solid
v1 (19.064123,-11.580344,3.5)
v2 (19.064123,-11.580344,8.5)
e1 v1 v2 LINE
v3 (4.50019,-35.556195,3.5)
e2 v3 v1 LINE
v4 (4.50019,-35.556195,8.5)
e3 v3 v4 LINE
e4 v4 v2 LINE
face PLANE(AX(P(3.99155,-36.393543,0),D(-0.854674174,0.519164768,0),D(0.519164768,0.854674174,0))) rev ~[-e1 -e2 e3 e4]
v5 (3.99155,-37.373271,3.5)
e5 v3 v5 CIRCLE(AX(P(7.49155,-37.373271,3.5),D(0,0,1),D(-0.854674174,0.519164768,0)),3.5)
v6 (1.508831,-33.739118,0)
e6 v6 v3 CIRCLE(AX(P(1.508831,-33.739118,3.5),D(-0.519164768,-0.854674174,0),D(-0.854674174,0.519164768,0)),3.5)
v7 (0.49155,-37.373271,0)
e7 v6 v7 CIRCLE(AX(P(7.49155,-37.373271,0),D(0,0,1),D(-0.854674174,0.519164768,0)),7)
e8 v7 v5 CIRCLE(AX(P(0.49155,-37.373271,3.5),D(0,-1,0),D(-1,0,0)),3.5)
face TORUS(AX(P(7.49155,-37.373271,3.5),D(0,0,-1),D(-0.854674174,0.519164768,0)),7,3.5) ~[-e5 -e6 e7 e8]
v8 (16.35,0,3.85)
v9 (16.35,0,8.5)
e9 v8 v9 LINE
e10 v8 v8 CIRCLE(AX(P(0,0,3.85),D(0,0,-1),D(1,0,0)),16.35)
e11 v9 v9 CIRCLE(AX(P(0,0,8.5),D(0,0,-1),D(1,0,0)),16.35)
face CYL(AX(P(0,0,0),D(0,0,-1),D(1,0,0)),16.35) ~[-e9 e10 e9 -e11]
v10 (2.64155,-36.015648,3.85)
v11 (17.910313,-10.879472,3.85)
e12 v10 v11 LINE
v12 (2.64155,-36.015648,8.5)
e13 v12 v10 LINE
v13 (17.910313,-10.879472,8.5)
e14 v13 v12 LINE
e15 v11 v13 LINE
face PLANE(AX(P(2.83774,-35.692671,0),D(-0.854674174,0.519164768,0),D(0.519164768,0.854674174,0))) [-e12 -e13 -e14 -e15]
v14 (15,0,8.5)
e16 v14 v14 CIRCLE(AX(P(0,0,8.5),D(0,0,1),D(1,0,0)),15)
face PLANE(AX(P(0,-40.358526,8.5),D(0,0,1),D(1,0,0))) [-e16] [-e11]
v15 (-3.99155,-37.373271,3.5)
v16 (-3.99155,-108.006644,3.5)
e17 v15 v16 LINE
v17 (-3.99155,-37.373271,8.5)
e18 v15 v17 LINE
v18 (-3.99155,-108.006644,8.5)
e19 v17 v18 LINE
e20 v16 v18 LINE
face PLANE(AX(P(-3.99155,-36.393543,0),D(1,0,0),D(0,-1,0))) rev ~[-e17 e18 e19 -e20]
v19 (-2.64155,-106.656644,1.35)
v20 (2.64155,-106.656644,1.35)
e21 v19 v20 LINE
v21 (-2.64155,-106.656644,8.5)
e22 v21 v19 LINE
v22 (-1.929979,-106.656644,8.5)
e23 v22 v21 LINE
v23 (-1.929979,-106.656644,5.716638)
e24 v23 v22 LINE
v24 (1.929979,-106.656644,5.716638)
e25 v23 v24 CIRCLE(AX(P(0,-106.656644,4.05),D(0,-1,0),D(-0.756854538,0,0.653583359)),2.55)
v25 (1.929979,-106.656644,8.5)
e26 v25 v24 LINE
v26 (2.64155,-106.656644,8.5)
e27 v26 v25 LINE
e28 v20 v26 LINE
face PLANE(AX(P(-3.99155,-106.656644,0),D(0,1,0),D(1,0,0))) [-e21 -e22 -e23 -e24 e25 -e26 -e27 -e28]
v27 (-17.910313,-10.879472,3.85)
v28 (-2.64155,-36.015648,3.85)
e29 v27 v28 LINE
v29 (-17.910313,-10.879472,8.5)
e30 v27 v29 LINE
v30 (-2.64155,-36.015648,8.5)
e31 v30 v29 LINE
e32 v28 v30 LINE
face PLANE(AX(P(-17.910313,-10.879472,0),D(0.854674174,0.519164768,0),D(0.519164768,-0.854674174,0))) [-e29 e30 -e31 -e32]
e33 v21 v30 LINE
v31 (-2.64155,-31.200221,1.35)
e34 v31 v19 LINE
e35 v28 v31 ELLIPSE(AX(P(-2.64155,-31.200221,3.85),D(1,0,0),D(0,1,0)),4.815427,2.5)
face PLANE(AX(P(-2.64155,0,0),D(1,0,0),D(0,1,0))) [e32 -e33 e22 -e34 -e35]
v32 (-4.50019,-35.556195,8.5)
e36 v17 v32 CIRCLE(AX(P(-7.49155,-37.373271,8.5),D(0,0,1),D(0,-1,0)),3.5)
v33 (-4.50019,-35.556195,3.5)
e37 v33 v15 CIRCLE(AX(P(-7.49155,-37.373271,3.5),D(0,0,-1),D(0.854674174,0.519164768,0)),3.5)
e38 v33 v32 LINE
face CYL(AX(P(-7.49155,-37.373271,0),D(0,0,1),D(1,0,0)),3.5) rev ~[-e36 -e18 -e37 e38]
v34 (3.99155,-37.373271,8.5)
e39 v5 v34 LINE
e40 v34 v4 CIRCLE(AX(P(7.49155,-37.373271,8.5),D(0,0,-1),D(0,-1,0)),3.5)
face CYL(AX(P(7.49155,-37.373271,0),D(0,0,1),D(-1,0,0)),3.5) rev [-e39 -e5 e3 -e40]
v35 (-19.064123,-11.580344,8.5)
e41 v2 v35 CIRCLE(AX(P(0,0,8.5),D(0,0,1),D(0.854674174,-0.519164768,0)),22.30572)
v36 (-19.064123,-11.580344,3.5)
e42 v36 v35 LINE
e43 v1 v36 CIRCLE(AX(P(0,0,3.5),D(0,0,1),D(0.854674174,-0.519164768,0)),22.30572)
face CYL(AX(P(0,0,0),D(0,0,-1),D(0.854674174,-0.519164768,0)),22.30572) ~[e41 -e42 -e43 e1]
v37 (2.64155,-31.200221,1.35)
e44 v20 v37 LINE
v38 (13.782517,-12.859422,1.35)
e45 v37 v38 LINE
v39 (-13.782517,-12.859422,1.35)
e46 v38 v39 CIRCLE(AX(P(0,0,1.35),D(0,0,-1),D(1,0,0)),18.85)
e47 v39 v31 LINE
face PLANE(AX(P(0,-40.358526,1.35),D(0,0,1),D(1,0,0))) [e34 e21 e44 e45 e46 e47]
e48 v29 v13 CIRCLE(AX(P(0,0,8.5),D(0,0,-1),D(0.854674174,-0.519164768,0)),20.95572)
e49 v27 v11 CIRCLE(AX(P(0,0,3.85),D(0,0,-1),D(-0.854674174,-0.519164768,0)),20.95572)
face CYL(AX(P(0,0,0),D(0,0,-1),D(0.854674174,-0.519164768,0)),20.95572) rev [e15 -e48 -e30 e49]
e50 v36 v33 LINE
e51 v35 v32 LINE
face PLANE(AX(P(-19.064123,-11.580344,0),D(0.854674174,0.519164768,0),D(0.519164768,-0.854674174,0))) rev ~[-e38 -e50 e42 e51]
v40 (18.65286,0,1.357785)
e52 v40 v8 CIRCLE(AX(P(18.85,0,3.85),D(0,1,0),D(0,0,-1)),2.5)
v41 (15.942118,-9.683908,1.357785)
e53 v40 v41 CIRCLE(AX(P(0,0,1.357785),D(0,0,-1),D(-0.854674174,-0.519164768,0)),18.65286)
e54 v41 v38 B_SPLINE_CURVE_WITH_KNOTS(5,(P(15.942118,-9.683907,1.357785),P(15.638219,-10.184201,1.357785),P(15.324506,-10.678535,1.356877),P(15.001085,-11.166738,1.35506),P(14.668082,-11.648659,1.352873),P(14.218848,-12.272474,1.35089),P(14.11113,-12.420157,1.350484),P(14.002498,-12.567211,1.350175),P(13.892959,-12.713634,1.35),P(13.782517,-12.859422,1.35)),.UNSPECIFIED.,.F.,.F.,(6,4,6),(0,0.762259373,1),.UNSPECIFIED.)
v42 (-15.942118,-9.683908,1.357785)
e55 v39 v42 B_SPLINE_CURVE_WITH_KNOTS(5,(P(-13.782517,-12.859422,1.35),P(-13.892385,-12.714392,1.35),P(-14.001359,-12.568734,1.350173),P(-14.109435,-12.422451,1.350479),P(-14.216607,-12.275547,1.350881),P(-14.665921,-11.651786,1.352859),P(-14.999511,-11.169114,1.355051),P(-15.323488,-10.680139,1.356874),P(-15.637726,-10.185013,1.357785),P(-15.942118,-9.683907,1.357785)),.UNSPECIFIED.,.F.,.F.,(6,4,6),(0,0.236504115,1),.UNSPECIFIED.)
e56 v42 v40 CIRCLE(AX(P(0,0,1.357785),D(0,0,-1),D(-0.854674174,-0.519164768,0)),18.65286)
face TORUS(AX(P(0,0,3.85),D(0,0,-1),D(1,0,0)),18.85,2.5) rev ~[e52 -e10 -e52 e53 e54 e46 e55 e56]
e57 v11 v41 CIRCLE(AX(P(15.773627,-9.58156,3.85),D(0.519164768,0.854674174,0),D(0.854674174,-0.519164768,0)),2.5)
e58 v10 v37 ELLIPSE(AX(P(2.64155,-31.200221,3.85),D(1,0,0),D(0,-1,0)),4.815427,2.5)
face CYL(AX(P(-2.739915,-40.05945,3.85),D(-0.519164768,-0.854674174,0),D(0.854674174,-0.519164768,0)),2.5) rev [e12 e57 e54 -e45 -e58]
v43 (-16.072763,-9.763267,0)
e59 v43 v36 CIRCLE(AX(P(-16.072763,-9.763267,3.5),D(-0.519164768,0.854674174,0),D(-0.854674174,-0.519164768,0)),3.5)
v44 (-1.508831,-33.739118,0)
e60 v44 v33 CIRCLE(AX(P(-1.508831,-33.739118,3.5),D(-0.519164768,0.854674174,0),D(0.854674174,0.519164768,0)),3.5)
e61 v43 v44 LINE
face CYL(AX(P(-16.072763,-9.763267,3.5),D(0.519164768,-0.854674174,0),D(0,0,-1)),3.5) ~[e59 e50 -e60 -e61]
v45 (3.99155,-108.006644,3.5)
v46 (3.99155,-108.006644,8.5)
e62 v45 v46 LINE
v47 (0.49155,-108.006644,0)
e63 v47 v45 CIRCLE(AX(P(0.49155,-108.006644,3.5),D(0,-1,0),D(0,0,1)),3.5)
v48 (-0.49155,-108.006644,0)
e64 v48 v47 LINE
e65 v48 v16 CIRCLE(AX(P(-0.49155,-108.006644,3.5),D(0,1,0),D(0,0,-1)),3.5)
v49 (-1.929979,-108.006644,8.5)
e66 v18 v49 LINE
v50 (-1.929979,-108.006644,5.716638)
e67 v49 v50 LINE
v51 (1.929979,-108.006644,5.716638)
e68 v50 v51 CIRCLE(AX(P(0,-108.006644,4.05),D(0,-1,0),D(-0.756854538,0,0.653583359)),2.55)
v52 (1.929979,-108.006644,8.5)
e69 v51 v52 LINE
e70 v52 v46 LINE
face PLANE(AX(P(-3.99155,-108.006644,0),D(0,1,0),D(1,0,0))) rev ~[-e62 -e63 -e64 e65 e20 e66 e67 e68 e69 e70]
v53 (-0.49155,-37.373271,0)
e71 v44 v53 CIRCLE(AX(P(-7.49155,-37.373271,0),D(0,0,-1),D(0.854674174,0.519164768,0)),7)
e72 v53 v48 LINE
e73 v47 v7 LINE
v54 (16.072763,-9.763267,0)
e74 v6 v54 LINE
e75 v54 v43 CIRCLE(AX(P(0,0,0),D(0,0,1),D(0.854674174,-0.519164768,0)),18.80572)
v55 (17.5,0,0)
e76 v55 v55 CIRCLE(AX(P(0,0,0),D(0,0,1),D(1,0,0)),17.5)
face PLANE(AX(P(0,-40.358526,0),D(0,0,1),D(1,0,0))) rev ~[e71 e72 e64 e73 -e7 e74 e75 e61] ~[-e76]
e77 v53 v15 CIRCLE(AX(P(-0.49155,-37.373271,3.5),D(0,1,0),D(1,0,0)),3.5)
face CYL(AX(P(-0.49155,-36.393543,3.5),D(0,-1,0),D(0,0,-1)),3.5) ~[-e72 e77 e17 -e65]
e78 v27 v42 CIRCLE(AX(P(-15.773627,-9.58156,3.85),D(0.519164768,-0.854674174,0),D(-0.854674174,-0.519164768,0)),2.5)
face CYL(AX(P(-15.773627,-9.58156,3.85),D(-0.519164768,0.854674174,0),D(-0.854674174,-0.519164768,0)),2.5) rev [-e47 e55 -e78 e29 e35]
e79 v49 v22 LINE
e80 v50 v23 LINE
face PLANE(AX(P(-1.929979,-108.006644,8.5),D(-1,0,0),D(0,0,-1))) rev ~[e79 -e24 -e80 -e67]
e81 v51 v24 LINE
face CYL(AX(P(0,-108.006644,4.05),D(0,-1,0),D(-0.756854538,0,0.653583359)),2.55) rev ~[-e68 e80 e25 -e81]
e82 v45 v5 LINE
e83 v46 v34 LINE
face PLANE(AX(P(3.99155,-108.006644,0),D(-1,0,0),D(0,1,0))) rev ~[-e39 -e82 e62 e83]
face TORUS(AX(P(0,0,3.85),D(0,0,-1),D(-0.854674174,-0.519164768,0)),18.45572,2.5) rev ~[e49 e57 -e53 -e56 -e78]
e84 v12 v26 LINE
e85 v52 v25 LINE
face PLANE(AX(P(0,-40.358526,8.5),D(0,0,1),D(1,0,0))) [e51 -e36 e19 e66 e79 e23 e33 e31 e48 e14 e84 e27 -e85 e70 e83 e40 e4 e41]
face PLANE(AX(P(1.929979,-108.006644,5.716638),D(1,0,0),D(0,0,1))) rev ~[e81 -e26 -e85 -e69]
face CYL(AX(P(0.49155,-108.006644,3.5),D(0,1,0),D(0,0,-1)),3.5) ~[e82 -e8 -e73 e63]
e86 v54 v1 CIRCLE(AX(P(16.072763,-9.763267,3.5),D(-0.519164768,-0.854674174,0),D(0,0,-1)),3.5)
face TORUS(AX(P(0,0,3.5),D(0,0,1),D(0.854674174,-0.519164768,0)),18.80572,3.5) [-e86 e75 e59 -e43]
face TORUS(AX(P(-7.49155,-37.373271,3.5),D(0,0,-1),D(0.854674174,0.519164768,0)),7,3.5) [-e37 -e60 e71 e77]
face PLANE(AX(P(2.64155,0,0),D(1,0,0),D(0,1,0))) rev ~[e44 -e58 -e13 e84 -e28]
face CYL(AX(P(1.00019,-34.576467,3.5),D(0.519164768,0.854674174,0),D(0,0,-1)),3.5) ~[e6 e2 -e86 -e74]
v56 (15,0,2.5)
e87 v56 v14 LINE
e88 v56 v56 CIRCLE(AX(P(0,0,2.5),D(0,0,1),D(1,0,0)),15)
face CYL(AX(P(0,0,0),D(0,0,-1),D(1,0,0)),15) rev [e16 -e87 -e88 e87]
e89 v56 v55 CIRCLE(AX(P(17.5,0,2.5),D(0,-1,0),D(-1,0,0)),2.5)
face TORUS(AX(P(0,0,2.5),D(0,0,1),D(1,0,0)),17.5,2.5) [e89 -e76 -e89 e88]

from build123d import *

# Parameters (mm, degrees)
F0_R         = 15
F1_DEPTH     = 8.5
F2_T         = -1.35
F4_DEPTH     = 80
F5_R         = 3.5
F6_T3_ANGLE  = 242.5524848973
F6_T9_DEPTH  = 35.6602445691
F6_T13_DEPTH = 35.6602445691


# Not quite as in the source:
# - a fillet or chamfer that OpenCascade refuses, or shapes differently, is made with other operations: its cross-section is extruded or revolved along the edge and cut away or added


with BuildPart() as f1:
    # F0 (on Top) → F1 (new body)
    with BuildSketch(Plane.XY):
        with BuildLine():
            Line((-3.9915498981, -108.0066443023), (3.9915498981, -108.0066443023))
            Line((3.9915498981, -108.0066443023), (3.9915498981, -36.3935431888))
            Line((3.9915498981, -36.3935431888), (19.064122832, -11.5803439591))
            ThreePointArc((19.064122832, -11.5803439591), (0, 22.3057200189), (-19.064122832, -11.5803439591))
            Line((-19.064122832, -11.5803439591), (-3.9915498981, -36.3935431888))
            Line((-3.9915498981, -36.3935431888), (-3.9915498981, -108.0066443023))
        make_face()
        Circle(F0_R, mode=Mode.SUBTRACT)
    extrude(amount=F1_DEPTH)

    # F2
    f2_openings = [f1.faces().sort_by_distance(p)[0] for p in [
        (0, -28.543568, 8.5),
    ]]
    offset(amount=F2_T, openings=f2_openings, kind=Kind.INTERSECTION)

    # F3 (on face) → F4 (cut)
    with BuildSketch(Plane.XZ.offset(108.0066443023)):
        with BuildLine():
            Line((-1.9299790729, 8.5), (-1.9299790729, 5.7166375665))
            ThreePointArc((-1.9299790729, 5.7166375665), (0, 1.5), (1.9299790729, 5.7166375665))
            Line((1.9299790729, 5.7166375665), (1.9299790729, 8.5))
            Line((1.9299790729, 8.5), (-1.9299790729, 8.5))
        make_face()
    extrude(amount=-F4_DEPTH, mode=Mode.SUBTRACT)

    # F5
    f5_edges = [f1.edges().sort_by_distance(p)[0] for p in [
        (3.99155, -36.393543, 4.25),
        (-3.99155, -36.393543, 4.25),
        (-11.527836, -23.986944, 0),
        (3.99155, -72.200094, 0),
        (11.527836, -23.986944, 0),
        (0, 22.30572, 0),
        (-3.99155, -72.200094, 0),
    ]]
    fillet(f5_edges, radius=F5_R)

    # F6: fillet of radius 2.5 on 5 edges, made by hand


with BuildPart() as f6_tool1:
    # F6_s2 → F6_t3 (revolve)
    with BuildSketch(Plane(origin=(0, 0, 0), x_dir=(0, 0, 1), z_dir=(0.519164768, -0.854674174, 0))):
        with BuildLine():
            ThreePointArc((3.85, 20.9557200189), (2.082233047, 20.2234869719), (1.35, 18.4557200189))
            Line((1.35, 18.4557200189), (1.35, 20.9557200189))
            Line((1.35, 20.9557200189), (3.85, 20.9557200189))
        make_face()
    revolve(axis=Axis((0, 0, 1.35), (0, 0, -1)), revolution_arc=F6_T3_ANGLE)


with BuildPart() as f6_tool4:
    # F6_s5 → F6_t6 (revolve)
    with BuildSketch(Plane.XZ):
        with BuildLine():
            ThreePointArc((18.85, 1.35), (17.082233047, 2.082233047), (16.35, 3.85))
            Line((16.35, 3.85), (16.35, 1.35))
            Line((16.35, 1.35), (18.85, 1.35))
        make_face()
    revolve(axis=Axis((0, 0, 1.35), (0, 0, -1)))


with BuildPart() as f6_tool7:
    # F6_s8 → F6_t9 (new body)
    with BuildSketch(Plane(origin=(0, 0, 0), x_dir=(0, 0, 1), z_dir=(0.519164768, -0.854674174, 0))):
        with BuildLine():
            ThreePointArc((3.85, 20.9557200189), (2.082233047, 20.2234869719), (1.35, 18.4557200189))
            Line((1.35, 18.4557200189), (1.35, 20.9557200189))
            Line((1.35, 20.9557200189), (3.85, 20.9557200189))
        make_face()
    extrude(amount=F6_T9_DEPTH)

    split(bisect_by=Plane.YZ.offset(-2.6415498981), keep=Keep.BOTTOM)


with BuildPart() as f6_tool11:
    # F6_s12 → F6_t13 (new body)
    with BuildSketch(Plane(origin=(-18.5135425991, -30.4778900706, 0), x_dir=(0, 0, 1), z_dir=(0.519164768, 0.854674174, 0))):
        with BuildLine():
            ThreePointArc((3.85, 20.9557200189), (2.082233047, 20.2234869719), (1.35, 18.4557200189))
            Line((1.35, 18.4557200189), (1.35, 20.9557200189))
            Line((1.35, 20.9557200189), (3.85, 20.9557200189))
        make_face()
    extrude(amount=F6_T13_DEPTH)

    split(bisect_by=Plane.YZ.offset(2.6415498981), keep=Keep.TOP)


with BuildPart() as f1_1:
    add(f1.part)

    # F6_t15: union F6_tool1, F6_tool4, F6_tool7, F6_tool11
    add([f6_tool1.part, f6_tool4.part, f6_tool7.part, f6_tool11.part])

    # F6_s16 → F6_t17 (revolve, cut)
    with BuildSketch(Plane.XZ):
        with BuildLine():
            ThreePointArc((15, 2.5), (15.732233047, 0.732233047), (17.5, 0))
            Line((17.5, 0), (15, 0))
            Line((15, 0), (15, 2.5))
        make_face()
    revolve(axis=Axis((0, 0, 0), (0, 0, 1)), mode=Mode.SUBTRACT)


solid = f1_1.part
